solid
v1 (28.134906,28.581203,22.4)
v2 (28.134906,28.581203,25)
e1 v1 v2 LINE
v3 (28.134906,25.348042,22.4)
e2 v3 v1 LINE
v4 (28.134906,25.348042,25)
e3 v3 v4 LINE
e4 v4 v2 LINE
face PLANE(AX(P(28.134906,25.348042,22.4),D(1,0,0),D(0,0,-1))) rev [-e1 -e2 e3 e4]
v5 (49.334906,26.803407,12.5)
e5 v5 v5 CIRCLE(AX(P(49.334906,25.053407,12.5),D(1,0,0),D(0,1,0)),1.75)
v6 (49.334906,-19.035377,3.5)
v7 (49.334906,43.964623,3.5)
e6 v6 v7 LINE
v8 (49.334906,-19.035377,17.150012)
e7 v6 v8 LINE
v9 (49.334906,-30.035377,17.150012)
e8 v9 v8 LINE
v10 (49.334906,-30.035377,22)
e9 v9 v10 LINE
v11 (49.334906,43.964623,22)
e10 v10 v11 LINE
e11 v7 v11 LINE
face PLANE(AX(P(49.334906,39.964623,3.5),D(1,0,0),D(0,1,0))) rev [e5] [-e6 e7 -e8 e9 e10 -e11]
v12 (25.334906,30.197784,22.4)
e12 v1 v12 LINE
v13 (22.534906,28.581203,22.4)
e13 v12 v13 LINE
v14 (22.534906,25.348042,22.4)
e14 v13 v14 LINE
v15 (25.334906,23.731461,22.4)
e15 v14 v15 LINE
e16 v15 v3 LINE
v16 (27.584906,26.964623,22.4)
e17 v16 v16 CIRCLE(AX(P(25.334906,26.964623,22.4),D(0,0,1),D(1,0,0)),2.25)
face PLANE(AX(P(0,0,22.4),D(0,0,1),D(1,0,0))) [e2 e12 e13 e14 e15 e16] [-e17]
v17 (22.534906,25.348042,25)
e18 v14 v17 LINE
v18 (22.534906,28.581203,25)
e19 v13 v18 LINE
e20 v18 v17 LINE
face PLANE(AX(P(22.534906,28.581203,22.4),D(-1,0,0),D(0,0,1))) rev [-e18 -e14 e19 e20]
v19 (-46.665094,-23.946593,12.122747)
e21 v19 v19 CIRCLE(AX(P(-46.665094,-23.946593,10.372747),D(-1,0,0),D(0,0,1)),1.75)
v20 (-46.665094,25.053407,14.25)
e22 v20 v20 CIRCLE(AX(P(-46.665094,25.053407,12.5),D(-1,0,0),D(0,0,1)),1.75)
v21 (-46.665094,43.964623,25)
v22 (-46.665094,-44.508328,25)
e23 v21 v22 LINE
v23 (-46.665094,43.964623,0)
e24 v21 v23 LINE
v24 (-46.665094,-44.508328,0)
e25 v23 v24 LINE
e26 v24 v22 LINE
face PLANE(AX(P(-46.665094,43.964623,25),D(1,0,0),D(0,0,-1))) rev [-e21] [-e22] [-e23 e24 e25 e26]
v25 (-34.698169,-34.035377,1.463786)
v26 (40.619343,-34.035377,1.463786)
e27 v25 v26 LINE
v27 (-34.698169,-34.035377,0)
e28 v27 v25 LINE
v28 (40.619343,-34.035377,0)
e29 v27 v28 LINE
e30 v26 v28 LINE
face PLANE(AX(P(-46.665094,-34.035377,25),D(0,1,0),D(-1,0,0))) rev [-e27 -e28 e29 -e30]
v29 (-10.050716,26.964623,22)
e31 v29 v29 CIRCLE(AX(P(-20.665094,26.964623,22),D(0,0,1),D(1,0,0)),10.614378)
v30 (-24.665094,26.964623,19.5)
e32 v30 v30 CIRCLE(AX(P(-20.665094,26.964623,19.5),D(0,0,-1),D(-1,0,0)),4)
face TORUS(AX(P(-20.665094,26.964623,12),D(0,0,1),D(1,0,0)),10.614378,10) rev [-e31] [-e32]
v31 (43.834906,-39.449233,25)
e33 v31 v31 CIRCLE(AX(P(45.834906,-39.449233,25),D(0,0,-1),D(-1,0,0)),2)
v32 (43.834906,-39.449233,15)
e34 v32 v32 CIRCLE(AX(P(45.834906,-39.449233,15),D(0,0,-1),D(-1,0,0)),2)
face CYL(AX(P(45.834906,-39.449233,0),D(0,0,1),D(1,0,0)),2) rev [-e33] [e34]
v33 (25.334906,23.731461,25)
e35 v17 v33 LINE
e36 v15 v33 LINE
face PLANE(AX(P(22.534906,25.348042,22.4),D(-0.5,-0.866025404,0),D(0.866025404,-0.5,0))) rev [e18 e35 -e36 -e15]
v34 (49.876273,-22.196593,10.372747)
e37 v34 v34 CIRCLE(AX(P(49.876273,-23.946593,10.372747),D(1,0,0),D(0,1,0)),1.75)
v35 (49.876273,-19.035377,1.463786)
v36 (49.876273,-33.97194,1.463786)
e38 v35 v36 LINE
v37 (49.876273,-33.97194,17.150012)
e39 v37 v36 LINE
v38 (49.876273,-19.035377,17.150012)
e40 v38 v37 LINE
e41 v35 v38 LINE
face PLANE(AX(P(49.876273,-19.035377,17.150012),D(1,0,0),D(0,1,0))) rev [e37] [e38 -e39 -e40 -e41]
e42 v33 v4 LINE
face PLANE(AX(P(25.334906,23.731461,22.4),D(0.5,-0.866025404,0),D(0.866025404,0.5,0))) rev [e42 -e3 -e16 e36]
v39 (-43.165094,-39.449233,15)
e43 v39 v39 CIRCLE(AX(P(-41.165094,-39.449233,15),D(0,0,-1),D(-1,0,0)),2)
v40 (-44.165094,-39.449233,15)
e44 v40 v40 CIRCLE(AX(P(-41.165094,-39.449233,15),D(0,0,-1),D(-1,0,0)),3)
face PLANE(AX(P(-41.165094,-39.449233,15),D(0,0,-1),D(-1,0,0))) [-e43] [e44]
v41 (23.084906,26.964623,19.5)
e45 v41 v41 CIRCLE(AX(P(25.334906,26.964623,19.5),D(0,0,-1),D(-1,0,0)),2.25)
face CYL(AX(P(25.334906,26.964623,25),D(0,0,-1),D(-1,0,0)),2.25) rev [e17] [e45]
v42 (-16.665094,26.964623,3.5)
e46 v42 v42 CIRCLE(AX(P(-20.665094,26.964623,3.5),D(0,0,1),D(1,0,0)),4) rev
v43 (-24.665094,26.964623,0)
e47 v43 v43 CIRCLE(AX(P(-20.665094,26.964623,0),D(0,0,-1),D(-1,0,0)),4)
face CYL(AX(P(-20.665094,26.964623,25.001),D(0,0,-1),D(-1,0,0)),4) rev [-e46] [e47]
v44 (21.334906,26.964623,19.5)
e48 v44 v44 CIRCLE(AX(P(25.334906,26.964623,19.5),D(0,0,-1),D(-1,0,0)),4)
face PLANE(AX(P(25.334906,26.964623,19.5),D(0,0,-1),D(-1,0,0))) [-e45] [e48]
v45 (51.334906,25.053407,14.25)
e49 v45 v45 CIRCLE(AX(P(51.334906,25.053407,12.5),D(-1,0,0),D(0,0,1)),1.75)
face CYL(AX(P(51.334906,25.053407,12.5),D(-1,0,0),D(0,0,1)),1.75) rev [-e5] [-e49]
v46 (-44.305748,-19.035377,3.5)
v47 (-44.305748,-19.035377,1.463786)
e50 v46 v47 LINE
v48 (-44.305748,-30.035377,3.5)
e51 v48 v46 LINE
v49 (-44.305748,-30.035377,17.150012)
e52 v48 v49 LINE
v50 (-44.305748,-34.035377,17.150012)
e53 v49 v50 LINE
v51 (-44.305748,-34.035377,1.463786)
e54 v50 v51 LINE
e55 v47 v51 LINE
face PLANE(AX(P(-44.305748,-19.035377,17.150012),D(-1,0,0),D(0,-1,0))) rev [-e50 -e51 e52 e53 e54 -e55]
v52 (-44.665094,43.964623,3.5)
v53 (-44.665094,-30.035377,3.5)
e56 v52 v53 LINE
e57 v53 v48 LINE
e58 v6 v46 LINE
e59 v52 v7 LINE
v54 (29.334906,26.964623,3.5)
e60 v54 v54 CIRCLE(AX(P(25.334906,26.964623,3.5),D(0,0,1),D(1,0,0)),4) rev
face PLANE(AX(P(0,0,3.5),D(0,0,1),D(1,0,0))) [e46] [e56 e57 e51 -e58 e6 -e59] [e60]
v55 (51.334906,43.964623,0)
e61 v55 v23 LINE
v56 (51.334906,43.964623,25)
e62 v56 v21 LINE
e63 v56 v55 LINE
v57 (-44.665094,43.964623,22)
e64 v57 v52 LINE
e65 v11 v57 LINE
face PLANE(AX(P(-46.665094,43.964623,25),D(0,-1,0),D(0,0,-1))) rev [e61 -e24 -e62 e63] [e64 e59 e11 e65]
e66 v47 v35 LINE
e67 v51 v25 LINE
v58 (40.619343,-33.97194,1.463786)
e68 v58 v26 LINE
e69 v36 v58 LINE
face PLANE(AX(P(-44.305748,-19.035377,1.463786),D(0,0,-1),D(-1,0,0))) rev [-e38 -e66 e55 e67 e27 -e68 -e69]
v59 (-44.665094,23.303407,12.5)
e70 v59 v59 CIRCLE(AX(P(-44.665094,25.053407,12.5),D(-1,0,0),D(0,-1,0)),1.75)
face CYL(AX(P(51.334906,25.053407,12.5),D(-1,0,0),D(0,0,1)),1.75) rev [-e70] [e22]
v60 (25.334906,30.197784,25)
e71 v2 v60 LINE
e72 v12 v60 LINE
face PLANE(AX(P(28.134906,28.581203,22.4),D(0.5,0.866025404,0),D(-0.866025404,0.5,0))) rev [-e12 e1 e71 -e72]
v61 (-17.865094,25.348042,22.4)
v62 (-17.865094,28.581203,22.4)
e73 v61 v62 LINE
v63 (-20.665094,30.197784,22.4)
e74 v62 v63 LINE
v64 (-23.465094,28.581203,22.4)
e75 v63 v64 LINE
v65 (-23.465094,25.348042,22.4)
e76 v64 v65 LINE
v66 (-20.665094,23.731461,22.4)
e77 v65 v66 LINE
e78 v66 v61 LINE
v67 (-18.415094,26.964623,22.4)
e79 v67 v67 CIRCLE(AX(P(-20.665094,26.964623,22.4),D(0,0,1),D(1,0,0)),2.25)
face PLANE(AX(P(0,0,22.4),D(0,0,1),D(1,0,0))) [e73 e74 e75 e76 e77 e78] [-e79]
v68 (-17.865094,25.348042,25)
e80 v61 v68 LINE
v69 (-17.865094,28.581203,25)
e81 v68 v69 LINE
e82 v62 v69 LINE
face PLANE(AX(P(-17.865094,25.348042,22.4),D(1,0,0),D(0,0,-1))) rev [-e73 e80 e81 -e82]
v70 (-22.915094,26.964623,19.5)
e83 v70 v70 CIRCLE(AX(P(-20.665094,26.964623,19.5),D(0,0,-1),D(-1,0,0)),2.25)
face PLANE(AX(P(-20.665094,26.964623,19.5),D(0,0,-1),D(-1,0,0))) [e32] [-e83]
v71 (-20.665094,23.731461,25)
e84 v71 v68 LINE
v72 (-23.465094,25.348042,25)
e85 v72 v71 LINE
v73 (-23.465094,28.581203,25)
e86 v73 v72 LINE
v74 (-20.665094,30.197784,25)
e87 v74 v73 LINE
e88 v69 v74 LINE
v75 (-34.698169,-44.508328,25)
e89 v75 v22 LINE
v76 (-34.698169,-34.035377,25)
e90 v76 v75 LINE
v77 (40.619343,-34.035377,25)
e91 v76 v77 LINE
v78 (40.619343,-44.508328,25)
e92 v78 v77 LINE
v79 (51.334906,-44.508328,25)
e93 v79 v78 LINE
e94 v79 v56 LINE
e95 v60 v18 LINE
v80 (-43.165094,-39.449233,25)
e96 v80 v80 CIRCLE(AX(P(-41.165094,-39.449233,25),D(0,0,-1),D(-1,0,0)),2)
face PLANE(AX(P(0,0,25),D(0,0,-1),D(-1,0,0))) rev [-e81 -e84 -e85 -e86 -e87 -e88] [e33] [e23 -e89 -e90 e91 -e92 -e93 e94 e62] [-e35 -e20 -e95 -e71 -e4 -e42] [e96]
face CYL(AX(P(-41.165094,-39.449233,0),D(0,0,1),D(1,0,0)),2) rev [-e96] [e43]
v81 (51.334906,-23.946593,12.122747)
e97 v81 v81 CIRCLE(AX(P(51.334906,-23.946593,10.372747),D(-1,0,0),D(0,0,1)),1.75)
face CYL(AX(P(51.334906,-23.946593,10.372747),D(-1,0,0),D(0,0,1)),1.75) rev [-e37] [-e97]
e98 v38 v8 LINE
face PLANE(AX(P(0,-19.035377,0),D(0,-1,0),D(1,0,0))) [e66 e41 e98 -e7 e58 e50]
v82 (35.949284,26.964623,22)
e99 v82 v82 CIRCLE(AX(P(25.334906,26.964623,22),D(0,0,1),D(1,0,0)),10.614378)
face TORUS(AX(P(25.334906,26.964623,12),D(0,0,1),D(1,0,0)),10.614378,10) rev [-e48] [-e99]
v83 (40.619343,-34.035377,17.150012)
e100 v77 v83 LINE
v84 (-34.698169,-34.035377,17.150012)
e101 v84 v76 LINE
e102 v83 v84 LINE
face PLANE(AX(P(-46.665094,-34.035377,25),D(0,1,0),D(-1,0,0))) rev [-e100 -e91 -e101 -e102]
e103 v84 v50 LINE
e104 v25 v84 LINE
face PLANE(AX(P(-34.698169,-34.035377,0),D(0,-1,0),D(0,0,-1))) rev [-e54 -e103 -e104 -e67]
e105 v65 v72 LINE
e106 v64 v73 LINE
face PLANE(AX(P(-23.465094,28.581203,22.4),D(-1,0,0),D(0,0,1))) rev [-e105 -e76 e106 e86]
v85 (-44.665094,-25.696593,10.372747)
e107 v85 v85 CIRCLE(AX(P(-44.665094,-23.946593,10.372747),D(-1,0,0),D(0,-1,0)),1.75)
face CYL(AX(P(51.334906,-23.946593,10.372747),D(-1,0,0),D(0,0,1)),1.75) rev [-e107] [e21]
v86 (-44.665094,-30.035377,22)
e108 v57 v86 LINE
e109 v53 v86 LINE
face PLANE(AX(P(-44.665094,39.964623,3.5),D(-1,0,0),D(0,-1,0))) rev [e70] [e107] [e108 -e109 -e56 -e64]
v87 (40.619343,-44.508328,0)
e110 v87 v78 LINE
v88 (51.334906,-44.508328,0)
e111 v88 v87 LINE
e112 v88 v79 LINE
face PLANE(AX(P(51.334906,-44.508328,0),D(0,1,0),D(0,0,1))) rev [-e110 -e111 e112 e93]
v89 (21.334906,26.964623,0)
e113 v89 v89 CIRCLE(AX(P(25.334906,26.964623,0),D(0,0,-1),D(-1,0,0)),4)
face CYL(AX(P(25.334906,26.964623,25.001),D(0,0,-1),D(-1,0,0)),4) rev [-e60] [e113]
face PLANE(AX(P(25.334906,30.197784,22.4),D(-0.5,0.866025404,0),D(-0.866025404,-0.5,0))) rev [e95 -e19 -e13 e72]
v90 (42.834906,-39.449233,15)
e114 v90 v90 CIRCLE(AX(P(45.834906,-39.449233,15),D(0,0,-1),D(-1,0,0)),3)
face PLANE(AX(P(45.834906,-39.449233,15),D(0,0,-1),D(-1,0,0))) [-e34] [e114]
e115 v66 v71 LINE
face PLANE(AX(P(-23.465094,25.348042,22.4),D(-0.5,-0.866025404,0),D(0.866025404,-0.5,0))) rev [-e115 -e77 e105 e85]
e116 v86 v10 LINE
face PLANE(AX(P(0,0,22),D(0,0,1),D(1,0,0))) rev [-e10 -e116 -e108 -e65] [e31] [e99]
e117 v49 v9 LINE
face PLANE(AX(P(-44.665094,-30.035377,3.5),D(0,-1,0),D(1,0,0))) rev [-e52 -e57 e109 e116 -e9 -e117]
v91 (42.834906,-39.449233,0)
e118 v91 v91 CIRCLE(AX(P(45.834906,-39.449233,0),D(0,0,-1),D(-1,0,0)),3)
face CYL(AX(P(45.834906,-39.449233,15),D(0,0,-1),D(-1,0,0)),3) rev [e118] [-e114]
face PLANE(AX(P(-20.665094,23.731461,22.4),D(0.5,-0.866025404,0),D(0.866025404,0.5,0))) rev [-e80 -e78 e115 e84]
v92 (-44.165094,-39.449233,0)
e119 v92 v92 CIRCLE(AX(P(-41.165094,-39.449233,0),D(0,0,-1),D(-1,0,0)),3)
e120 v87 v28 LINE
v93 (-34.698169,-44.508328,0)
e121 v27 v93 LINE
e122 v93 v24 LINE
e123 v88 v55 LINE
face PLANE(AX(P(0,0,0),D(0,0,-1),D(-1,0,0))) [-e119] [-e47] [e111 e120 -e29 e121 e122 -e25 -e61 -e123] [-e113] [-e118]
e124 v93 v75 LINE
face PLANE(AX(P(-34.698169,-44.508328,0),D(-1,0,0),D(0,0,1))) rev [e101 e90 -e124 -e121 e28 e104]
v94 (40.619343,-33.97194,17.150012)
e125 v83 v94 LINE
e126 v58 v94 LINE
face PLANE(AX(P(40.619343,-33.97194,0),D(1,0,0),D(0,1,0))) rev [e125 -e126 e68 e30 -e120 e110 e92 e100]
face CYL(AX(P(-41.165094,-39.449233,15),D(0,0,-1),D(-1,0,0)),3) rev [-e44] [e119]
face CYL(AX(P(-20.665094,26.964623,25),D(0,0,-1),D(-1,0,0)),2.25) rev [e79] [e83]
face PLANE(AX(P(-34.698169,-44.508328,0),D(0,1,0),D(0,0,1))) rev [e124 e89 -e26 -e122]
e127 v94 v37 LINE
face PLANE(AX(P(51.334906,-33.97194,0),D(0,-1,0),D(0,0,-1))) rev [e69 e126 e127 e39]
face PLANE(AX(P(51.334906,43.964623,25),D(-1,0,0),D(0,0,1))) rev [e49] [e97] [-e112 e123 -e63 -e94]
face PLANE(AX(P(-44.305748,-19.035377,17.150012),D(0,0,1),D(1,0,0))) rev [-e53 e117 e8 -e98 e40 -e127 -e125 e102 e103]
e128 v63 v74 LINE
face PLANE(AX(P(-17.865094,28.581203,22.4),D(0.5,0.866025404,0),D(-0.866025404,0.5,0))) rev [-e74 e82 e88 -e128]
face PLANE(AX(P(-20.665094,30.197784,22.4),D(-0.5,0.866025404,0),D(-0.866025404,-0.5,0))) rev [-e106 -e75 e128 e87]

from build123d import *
from build123d.topology import SkipClean

# Parameters (mm, degrees)
SKETCH_2_W           = 98
SKETCH_2_H           = 78
SKETCH_2_R           = 2.25
EXTRUDE_1_DEPTH      = 25
SKETCH_4_W           = 94.182021657
SKETCH_4_H           = 15.686226028
CUT_EXTRUDE_1_DEPTH  = 15
CUT_EXTRUDE_START    = -21.5
SKETCH_3_W           = 94
SKETCH_3_H           = 70
SKETCH_3_R           = 2.25
CUT_EXTRUDE_2_DEPTH  = 18.5
CUT_EXTRUDE_3_REACH  = 74.064
SKETCH_5_R           = 4
EXTRUDE_3_DEPTH      = 22
EXTRUDE_3_DEPTH_BACK = 3
SKETCH_6_W           = 11.966924864
SKETCH_6_H           = 10.472950633
SKETCH_6_R           = 2
SKETCH_6_W_2         = 10.715562549
SKETCH_6_H_2         = 10.536387569
SKETCH_7_R           = 3
CUT_EXTRUDE_4_DEPTH  = 15
SKETCH_9_W           = 94
SKETCH_9_H           = 18.5
CUT_EXTRUDE_5_DEPTH  = 15
EXTRUDE_START        = 2.5
SKETCH_10_R          = 4
SKETCH_10_R_2        = 2.25
EXTRUDE_4_DEPTH      = 2.5
FILLET_1_R           = 10
SKETCH_12_R          = 1.75
CUT_EXTRUDE_6_DEPTH  = 111.498829227
CUT_EXTRUDE_7_DEPTH  = 2.6


with BuildPart() as part:
    # 草图2 → 凸台-拉伸1 (new body)
    with BuildSketch(Plane.XY):
        with Locations((2.33490566, 4.964622642)):
            Rectangle(SKETCH_2_W, SKETCH_2_H)
        with Locations((-20.66509434, 26.964622642)):
            Circle(SKETCH_2_R, mode=Mode.SUBTRACT)
        with Locations((25.33490566, 26.964622642)):
            Circle(SKETCH_2_R, mode=Mode.SUBTRACT)
    extrude(amount=EXTRUDE_1_DEPTH)

    # 草图4 → 切除-拉伸1 (cut)
    with BuildSketch(Plane.XZ.offset(34.035377358)):
        with Locations((2.785262667, 9.306899291)):
            Rectangle(SKETCH_4_W, SKETCH_4_H)
    extrude(amount=-CUT_EXTRUDE_1_DEPTH, mode=Mode.SUBTRACT)

    # 草图3 → 切除-拉伸2 (cut)
    with BuildSketch(Plane.XY.offset(25).offset(CUT_EXTRUDE_START)):
        with Locations((2.33490566, 4.964622642)):
            Rectangle(SKETCH_3_W, SKETCH_3_H)
        with Locations((-20.66509434, 26.964622642)):
            Circle(SKETCH_3_R, mode=Mode.SUBTRACT)
        with Locations((25.33490566, 26.964622642)):
            Circle(SKETCH_3_R, mode=Mode.SUBTRACT)
    extrude(amount=CUT_EXTRUDE_2_DEPTH, mode=Mode.SUBTRACT)

    # 草图5 → 切除-拉伸3 (cut, up to next)
    with BuildSketch(Plane(origin=(0, 0, 0), x_dir=(-1, 0, 0), z_dir=(0, 0, -1)), mode=Mode.PRIVATE) as cut_extrude_3_sk1:
        with Locations((-25.33490566, 26.964622642)):
            Circle(SKETCH_5_R)
    cut_extrude_3_tool1 = extrude(cut_extrude_3_sk1.sketch, amount=-CUT_EXTRUDE_3_REACH, mode=Mode.PRIVATE) & part.part
    # 草图5 → 切除-拉伸3 (cut, up to next)
    with BuildSketch(Plane(origin=(0, 0, 0), x_dir=(-1, 0, 0), z_dir=(0, 0, -1)), mode=Mode.PRIVATE) as cut_extrude_3_sk2:
        with Locations((20.66509434, 26.964622642)):
            Circle(SKETCH_5_R)
    cut_extrude_3_tool2 = extrude(cut_extrude_3_sk2.sketch, amount=-CUT_EXTRUDE_3_REACH, mode=Mode.PRIVATE) & part.part
    add(cut_extrude_3_tool1.solids().sort_by_distance((25.334906, 26.964623, 0))[0], mode=Mode.SUBTRACT)
    add(cut_extrude_3_tool2.solids().sort_by_distance((-20.665094, 26.964623, 0))[0], mode=Mode.SUBTRACT)

    # 草图6 → 凸台-拉伸3 (add, two sides: drawn at the far end of the back side and taken through both)
    # profile 1 of 2: a face of its own
    with BuildSketch(Plane(origin=(0, 0, 22), x_dir=(-1, 0, 0), z_dir=(0, 0, -1)).offset(-EXTRUDE_3_DEPTH_BACK)):
        with Locations((40.681631908, -39.271852675)):
            Rectangle(SKETCH_6_W, SKETCH_6_H)
        with Locations((41.16509434, -39.449232705)):
            Circle(SKETCH_6_R, mode=Mode.SUBTRACT)
    # profile 2 of 2: a face of its own
    with BuildSketch(Plane(origin=(0, 0, 22), x_dir=(-1, 0, 0), z_dir=(0, 0, -1)).offset(-EXTRUDE_3_DEPTH_BACK)):
        with Locations((-45.977124386, -39.240134207)):
            Rectangle(SKETCH_6_W_2, SKETCH_6_H_2)
        with Locations((-45.83490566, -39.449232705)):
            Circle(SKETCH_6_R, mode=Mode.SUBTRACT)
    extrude(amount=EXTRUDE_3_DEPTH + EXTRUDE_3_DEPTH_BACK)

    # 草图7 → 切除-拉伸4 (cut)
    with BuildSketch(Plane(origin=(0, 0, 0), x_dir=(-1, 0, 0), z_dir=(0, 0, -1))):
        with Locations((-45.83490566, -39.449232705)):
            Circle(SKETCH_7_R)
        with Locations((41.16509434, -39.449232705)):
            Circle(SKETCH_7_R)
    extrude(amount=-CUT_EXTRUDE_4_DEPTH, mode=Mode.SUBTRACT)

    # 草图9 → 切除-拉伸5 (cut)
    with BuildSketch(Plane.XZ.offset(-39.964622642)):
        with Locations((2.33490566, 12.75)):
            Rectangle(SKETCH_9_W, SKETCH_9_H)
    extrude(amount=-CUT_EXTRUDE_5_DEPTH, mode=Mode.SUBTRACT)

    # 草图10 → 凸台-拉伸4 (add)
    # profile 1 of 2: a face of its own
    with SkipClean():  # the faces are left unmerged after this step: merging them gives an invalid solid
        with BuildSketch(Plane(origin=(0, 0, 22), x_dir=(-1, 0, 0), z_dir=(0, 0, -1)).offset(EXTRUDE_START)):
            with Locations((-25.33490566, 26.964622642)):
                Circle(SKETCH_10_R)
            with Locations((-25.33490566, 26.964622642)):
                Circle(SKETCH_10_R_2, mode=Mode.SUBTRACT)
        # profile 2 of 2: a face of its own
        with BuildSketch(Plane(origin=(0, 0, 22), x_dir=(-1, 0, 0), z_dir=(0, 0, -1)).offset(EXTRUDE_START)):
            with Locations((20.66509434, 26.964622642)):
                Circle(SKETCH_10_R)
            with Locations((20.66509434, 26.964622642)):
                Circle(SKETCH_10_R_2, mode=Mode.SUBTRACT)
        extrude(amount=-EXTRUDE_4_DEPTH)

    # 圆角1
    # the kernel refuses this fillet: 10 mm, written as the material it adds along each edge
    with BuildSketch(Plane(origin=(25.33490566, 26.964622642, 22), x_dir=(-1, 0, 0), z_dir=(0, -1, 0))) as fillet_1_piece_1:
        with BuildLine():
            CenterArc((10.614378278, 10), FILLET_1_R, 228.590377891, 41.409622109)
            Line((4, 2.5), (3.867712434, 2.35))
            ThreePointArc((3.867712434, 2.35), (3.8, 1.25), (3.8, 0))
            Line((3.8, 0), (4, -0.2))
            Line((4, -0.2), (10.614378278, -0.2))
            Line((10.614378278, -0.2), (10.614378278, 0))
        make_face()
    revolve(axis=Axis((25.33490566, 26.964622642, 22), (0, 0, -1)))
    with BuildSketch(Plane(origin=(-20.66509434, 26.964622642, 22), x_dir=(-1, 0, 0), z_dir=(0, -1, 0))) as fillet_1_piece_2:
        with BuildLine():
            CenterArc((10.614378278, 10), FILLET_1_R, 228.590377891, 41.409622109)
            Line((4, 2.5), (3.867712434, 2.35))
            ThreePointArc((3.867712434, 2.35), (3.8, 1.25), (3.8, 0))
            Line((3.8, 0), (4, -0.2))
            Line((4, -0.2), (10.614378278, -0.2))
            Line((10.614378278, -0.2), (10.614378278, 0))
        make_face()
    revolve(axis=Axis((-20.66509434, 26.964622642, 22), (0, 0, -1)))

    # 草图12 → 切除-拉伸6 (cut, through all)
    with BuildSketch(Plane.ZY.offset(46.66509434)):
        with Locations((10.372747463, -23.946592615)):
            Circle(SKETCH_12_R)
        with Locations((12.5, 25.053407385)):
            Circle(SKETCH_12_R)
    extrude(amount=-CUT_EXTRUDE_6_DEPTH, mode=Mode.SUBTRACT)

    # 草图13 → 切除-拉伸7 (cut)
    with BuildSketch(Plane.XY.offset(25)):
        Polygon((-20.66509434, 30.197784149), (-23.46509434, 28.581203395), (-23.46509434, 25.348041888), (-20.66509434, 23.731461134), (-17.86509434, 25.348041888), (-17.86509434, 28.581203395), align=None)
        Polygon((25.33490566, 30.197784149), (22.53490566, 28.581203395), (22.53490566, 25.348041888), (25.33490566, 23.731461134), (28.13490566, 25.348041888), (28.13490566, 28.581203395), align=None)
    extrude(amount=-CUT_EXTRUDE_7_DEPTH, mode=Mode.SUBTRACT)


solid = part.part
